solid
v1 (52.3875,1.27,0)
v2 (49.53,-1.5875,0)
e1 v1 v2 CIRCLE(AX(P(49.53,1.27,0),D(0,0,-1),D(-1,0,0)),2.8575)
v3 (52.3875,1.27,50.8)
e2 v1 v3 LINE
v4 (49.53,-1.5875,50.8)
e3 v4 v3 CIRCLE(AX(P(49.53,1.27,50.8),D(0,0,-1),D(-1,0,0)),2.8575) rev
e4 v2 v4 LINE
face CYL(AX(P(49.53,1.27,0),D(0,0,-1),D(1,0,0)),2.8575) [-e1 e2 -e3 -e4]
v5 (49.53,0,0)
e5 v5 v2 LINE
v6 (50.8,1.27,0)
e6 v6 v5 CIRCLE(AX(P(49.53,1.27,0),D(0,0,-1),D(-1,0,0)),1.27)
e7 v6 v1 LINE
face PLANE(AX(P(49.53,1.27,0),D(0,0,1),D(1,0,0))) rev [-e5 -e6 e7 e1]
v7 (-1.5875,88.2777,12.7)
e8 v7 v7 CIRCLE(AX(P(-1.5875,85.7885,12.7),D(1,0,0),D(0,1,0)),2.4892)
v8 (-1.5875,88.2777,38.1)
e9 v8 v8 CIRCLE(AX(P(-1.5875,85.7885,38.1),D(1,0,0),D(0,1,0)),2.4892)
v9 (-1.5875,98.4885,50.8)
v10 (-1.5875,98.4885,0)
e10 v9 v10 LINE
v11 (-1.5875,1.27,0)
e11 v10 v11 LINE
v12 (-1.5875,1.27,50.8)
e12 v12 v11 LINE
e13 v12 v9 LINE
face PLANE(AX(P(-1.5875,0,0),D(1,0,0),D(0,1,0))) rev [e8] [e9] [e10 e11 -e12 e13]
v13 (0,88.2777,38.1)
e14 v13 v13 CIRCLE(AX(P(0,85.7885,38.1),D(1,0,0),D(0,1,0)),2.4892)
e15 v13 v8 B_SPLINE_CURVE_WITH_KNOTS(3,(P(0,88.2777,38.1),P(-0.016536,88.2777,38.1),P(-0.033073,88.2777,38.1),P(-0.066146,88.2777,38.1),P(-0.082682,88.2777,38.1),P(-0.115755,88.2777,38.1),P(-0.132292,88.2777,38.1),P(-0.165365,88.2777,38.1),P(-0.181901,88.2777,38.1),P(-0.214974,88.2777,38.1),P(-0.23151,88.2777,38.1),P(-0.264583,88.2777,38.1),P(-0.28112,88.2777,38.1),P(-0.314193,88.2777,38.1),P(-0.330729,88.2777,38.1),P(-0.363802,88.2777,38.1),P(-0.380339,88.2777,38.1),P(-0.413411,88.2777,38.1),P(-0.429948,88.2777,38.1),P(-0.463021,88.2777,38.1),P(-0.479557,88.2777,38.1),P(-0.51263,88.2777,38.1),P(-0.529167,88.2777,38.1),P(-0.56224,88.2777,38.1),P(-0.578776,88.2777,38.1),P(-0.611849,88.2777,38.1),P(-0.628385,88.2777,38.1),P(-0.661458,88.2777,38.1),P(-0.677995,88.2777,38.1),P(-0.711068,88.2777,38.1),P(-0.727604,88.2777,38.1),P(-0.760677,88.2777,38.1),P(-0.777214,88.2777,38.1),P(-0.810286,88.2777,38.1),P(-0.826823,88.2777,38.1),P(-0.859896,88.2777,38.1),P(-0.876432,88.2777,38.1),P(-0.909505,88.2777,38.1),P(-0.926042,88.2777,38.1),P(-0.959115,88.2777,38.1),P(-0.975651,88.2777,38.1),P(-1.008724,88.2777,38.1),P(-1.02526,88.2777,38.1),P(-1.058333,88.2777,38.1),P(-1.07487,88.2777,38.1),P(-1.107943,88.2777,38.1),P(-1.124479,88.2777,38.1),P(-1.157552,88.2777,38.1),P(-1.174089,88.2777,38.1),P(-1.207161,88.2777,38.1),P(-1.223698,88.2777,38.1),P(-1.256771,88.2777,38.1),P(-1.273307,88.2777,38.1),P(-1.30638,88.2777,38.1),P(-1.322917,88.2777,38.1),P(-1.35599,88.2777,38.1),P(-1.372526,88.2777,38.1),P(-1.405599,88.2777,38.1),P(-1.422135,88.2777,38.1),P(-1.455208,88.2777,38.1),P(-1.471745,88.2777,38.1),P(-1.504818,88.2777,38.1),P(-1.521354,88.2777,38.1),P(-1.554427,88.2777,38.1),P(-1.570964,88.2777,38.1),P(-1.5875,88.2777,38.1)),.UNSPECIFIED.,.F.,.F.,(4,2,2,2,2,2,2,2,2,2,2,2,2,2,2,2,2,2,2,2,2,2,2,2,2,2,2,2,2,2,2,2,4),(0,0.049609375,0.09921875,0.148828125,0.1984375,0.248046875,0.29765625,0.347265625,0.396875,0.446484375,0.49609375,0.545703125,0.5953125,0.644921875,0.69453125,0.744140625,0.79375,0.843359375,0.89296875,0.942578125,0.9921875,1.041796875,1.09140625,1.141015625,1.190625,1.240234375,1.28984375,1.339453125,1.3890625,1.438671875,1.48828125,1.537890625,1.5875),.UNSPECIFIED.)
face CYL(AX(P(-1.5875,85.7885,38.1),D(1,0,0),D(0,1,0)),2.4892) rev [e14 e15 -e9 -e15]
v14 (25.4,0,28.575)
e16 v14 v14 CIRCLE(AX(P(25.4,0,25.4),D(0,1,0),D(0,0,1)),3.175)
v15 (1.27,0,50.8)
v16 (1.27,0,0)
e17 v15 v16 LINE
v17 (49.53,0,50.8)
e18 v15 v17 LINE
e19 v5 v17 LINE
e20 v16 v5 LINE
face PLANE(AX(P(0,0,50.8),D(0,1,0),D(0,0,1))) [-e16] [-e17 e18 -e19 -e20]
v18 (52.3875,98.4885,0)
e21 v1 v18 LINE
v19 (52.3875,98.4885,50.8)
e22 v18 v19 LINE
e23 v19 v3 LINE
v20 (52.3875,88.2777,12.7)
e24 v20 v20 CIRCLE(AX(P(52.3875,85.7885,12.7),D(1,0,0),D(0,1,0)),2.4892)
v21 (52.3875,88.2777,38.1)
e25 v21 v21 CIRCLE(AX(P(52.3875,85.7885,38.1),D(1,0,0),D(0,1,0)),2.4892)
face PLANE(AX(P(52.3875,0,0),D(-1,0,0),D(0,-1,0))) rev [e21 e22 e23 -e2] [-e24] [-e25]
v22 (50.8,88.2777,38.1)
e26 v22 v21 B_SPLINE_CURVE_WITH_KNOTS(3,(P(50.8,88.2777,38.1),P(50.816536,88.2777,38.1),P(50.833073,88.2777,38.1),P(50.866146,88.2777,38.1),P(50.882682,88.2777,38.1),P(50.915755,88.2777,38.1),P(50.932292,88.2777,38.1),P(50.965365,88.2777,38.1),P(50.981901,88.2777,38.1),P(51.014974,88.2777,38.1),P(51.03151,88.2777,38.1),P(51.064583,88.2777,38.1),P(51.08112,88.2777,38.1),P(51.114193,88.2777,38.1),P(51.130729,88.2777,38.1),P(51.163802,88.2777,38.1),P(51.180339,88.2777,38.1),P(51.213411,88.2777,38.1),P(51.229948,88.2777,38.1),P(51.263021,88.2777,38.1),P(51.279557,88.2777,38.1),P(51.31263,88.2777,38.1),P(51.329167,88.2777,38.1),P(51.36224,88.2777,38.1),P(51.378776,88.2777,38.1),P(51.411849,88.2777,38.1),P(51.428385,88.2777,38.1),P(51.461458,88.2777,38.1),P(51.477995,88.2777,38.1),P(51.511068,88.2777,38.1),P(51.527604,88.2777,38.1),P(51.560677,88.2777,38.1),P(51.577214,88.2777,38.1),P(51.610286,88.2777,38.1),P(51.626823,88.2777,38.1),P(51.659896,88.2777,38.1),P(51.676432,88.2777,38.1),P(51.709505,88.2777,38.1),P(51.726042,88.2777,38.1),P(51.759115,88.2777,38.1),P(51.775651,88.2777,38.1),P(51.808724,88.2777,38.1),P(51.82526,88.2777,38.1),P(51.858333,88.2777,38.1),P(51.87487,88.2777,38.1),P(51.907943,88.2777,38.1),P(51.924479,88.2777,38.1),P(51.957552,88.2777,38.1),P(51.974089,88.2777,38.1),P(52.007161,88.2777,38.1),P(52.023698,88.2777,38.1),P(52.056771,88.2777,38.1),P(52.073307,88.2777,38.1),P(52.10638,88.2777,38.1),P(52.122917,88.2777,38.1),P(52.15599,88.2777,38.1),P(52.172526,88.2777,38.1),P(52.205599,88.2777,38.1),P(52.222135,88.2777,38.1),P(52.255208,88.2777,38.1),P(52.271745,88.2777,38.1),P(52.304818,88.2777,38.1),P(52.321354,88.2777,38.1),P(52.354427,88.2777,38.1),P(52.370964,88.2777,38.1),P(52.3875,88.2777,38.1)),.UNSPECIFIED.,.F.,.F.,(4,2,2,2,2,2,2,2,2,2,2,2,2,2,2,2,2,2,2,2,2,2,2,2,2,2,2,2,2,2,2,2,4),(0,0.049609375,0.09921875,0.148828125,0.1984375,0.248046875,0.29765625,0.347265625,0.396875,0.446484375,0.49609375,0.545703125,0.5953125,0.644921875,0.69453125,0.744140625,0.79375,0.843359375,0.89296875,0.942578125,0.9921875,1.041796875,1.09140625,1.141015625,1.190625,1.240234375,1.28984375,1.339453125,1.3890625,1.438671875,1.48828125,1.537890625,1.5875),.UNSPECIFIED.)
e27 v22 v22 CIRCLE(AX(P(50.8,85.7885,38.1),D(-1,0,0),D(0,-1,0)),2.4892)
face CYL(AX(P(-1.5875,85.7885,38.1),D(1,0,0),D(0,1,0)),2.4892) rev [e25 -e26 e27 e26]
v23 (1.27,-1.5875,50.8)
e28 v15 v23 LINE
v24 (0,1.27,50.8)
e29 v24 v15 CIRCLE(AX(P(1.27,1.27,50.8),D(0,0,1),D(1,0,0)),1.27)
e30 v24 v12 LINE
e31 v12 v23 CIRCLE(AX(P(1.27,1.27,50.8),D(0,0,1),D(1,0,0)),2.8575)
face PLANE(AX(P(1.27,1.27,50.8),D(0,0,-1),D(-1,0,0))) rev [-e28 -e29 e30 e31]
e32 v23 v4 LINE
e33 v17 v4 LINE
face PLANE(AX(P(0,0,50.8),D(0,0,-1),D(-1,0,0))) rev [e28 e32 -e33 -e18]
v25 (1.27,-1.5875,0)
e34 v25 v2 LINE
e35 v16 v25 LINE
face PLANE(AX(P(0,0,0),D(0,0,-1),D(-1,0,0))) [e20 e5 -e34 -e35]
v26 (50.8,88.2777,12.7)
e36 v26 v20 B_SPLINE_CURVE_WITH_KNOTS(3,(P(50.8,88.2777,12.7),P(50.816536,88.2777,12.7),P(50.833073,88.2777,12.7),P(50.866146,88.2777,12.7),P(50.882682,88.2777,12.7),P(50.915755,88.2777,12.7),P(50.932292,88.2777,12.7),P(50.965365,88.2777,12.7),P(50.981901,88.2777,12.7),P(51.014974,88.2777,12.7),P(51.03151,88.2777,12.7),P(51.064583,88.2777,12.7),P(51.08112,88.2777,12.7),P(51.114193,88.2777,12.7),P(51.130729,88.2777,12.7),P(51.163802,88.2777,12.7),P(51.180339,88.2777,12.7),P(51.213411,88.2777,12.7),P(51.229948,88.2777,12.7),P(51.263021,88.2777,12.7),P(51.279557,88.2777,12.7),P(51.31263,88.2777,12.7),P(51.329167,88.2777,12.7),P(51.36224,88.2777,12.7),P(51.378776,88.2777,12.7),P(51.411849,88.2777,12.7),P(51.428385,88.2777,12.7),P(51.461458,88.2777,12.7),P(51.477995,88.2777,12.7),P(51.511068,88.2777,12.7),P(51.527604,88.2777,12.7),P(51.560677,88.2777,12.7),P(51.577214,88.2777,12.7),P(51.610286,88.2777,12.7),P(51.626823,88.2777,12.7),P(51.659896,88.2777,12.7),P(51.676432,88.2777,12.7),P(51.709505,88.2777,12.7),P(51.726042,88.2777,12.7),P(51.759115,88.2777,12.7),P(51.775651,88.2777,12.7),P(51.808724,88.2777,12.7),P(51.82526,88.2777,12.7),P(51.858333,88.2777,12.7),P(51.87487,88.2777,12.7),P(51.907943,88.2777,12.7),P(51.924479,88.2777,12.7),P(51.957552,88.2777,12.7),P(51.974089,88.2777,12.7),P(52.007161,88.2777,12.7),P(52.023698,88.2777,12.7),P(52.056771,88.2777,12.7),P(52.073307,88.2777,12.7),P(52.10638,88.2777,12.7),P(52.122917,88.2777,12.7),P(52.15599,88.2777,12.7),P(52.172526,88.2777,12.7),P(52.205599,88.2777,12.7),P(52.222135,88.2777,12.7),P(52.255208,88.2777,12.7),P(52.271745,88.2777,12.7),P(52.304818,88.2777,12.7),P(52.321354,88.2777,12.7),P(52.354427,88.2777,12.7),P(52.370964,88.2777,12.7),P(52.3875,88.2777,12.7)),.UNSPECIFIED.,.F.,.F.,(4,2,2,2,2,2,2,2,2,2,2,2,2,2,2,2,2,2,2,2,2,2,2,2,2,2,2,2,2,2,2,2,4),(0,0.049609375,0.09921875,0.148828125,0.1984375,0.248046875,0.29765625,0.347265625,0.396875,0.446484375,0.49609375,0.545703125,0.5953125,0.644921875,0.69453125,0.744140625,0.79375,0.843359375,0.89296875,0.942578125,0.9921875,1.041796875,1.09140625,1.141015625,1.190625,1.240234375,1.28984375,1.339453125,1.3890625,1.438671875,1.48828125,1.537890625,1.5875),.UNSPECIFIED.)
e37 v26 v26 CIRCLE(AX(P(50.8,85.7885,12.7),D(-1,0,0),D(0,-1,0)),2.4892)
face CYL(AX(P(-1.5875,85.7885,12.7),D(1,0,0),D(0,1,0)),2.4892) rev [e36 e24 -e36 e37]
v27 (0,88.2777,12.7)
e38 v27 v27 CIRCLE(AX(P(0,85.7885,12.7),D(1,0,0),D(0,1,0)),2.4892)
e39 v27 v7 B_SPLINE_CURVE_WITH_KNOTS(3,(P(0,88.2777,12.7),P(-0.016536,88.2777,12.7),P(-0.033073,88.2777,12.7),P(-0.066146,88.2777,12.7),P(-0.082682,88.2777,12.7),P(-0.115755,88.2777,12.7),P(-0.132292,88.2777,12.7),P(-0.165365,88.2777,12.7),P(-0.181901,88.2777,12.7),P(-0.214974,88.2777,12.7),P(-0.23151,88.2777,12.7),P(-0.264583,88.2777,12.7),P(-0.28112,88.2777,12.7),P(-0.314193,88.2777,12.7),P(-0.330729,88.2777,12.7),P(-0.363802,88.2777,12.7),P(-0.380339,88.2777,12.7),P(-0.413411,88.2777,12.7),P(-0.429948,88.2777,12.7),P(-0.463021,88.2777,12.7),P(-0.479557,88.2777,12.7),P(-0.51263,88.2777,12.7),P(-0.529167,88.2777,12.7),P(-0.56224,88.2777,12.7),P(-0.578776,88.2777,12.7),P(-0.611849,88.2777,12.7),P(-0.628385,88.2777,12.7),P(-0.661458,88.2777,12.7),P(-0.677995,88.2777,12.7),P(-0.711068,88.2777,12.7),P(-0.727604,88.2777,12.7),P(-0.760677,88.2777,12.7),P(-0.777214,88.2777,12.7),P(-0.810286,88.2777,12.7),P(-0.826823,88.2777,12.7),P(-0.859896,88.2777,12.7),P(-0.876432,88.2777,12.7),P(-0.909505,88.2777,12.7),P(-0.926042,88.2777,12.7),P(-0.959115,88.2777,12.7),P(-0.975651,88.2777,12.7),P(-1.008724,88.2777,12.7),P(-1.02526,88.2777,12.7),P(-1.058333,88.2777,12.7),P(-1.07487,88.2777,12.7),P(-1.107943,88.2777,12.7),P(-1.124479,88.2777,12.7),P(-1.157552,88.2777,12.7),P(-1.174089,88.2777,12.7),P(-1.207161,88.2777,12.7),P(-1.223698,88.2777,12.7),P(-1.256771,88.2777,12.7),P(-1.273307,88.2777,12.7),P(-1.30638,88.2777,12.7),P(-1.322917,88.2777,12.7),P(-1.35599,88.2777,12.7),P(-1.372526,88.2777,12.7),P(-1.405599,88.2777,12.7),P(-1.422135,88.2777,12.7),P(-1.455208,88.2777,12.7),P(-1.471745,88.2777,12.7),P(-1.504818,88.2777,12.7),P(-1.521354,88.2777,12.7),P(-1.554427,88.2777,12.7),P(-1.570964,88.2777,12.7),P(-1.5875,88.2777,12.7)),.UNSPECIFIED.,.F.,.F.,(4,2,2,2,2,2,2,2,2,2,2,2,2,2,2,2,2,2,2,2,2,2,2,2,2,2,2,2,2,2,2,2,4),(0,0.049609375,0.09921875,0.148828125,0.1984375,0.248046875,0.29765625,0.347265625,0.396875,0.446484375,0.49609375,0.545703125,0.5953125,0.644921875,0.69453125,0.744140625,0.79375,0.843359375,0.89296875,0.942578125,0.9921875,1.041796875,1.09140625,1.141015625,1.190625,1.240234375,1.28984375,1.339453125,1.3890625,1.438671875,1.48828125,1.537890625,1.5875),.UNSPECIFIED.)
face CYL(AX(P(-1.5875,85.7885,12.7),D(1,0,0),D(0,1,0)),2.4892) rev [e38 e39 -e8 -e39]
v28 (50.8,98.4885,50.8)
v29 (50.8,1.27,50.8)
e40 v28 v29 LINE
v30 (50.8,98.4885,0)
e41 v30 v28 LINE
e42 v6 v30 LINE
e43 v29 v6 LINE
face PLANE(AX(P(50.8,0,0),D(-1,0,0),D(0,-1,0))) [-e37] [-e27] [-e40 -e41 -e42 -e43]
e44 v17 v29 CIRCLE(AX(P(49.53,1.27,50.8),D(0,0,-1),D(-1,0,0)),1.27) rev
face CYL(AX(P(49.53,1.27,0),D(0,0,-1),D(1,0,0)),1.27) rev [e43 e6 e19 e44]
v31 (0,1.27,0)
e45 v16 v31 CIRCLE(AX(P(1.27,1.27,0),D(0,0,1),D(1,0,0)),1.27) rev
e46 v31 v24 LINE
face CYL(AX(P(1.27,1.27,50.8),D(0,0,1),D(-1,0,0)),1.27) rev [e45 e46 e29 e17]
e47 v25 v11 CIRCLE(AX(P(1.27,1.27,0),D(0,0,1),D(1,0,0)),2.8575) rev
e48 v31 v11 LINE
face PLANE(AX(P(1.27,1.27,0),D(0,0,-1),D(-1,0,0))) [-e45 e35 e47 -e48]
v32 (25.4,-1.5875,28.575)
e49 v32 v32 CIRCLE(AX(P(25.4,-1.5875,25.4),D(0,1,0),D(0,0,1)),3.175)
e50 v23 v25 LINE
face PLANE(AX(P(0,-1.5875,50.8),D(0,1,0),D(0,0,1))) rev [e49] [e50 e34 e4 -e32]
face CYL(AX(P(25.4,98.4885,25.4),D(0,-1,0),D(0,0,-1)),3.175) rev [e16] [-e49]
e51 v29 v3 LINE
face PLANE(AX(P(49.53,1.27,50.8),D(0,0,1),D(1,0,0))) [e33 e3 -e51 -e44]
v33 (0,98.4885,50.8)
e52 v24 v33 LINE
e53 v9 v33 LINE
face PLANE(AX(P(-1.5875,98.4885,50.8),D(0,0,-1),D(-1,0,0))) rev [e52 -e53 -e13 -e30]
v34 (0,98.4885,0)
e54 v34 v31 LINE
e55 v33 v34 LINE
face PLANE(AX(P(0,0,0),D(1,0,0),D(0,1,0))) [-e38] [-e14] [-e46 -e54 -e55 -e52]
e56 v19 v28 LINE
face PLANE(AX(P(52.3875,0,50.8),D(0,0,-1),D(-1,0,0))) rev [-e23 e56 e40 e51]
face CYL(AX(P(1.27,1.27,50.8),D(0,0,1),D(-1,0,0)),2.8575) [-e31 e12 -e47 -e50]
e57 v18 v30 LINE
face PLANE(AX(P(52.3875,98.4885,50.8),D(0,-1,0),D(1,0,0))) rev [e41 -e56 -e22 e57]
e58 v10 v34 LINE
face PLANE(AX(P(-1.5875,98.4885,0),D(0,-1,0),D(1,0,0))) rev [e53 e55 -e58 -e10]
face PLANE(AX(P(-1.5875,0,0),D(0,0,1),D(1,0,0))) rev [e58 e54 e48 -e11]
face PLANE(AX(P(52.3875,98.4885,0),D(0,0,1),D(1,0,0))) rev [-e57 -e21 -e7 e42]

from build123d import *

# Parameters (mm, degrees)
SKETCH9_W                    = 50.8
SKETCH9_H                    = 1.5875
BASE_FLANGE1_DEPTH           = 50.8
EDGE_FLANGE1_STRIP_W         = 8.89
EDGE_FLANGE1_STRIP_H         = 1.5875
EDGE_FLANGE1_STRIP_CUT_DEPTH = 50.8
EDGE_FLANGE1_DEPTH           = 50.8
EDGE_FLANGE2_STRIP_W         = 8.89
EDGE_FLANGE2_STRIP_H         = 1.5875
EDGE_FLANGE2_STRIP_CUT_DEPTH = 50.8
EDGE_FLANGE2_DEPTH           = 50.8
SKETCH20_R                   = 2.4892
CUT_EXTRUDE1_DEPTH           = 124.263641262
CUT_EXTRUDE2_DEPTH           = 124.855948312
CUT_EXTRUDE2_DEPTH_BACK      = 124.855948312
SKETCH21_R                   = 3.175


# Sheet-metal steps are written as plain solids
with BuildPart() as part:
    # Sketch9 → Base-Flange1 (new body)
    with BuildSketch(Plane.XY):
        with Locations((25.4, -0.79375)):
            Rectangle(SKETCH9_W, SKETCH9_H)
    extrude(amount=BASE_FLANGE1_DEPTH)

    # Edge-Flange1 strip (across the edge) → Edge-Flange1 strip cut (cut)
    with BuildSketch(Plane.XY):
        with Locations((-3.175, -0.79375)):
            Rectangle(EDGE_FLANGE1_STRIP_W, EDGE_FLANGE1_STRIP_H)
    extrude(amount=EDGE_FLANGE1_STRIP_CUT_DEPTH, mode=Mode.SUBTRACT)

    # Edge-Flange1 section (across the edge) → Edge-Flange1 (add)
    with BuildSketch(Plane.XY):
        with BuildLine():
            Line((-1.5875, 1.27), (-1.5875, 98.4885))
            Line((-1.5875, 98.4885), (0, 98.4885))
            Line((0, 98.4885), (0, 1.27))
            ThreePointArc((0, 1.27), (0.371974388, 0.371974388), (1.27, 0))
            Line((1.27, 0), (1.27, -1.5875))
            ThreePointArc((1.27, -1.5875), (-0.750557627, -0.750557627), (-1.5875, 1.27))
        make_face()
    extrude(amount=EDGE_FLANGE1_DEPTH)

    # Edge-Flange2 strip (across the edge) → Edge-Flange2 strip cut (cut)
    with BuildSketch(Plane(origin=(50.8, 0, 50.8), x_dir=(-1, 0, 0), z_dir=(0, 0, -1))):
        with Locations((-3.175, -0.79375)):
            Rectangle(EDGE_FLANGE2_STRIP_W, EDGE_FLANGE2_STRIP_H)
    extrude(amount=EDGE_FLANGE2_STRIP_CUT_DEPTH, mode=Mode.SUBTRACT)

    # Edge-Flange2 section (across the edge) → Edge-Flange2 (add)
    with BuildSketch(Plane(origin=(50.8, 0, 50.8), x_dir=(-1, 0, 0), z_dir=(0, 0, -1))):
        with BuildLine():
            Line((-1.5875, 1.27), (-1.5875, 98.4885))
            Line((-1.5875, 98.4885), (0, 98.4885))
            Line((0, 98.4885), (0, 1.27))
            ThreePointArc((0, 1.27), (0.371974388, 0.371974388), (1.27, 0))
            Line((1.27, 0), (1.27, -1.5875))
            ThreePointArc((1.27, -1.5875), (-0.750557627, -0.750557627), (-1.5875, 1.27))
        make_face()
    extrude(amount=EDGE_FLANGE2_DEPTH)

    # Sketch20 → Cut-Extrude1 (cut, through all)
    with BuildSketch(Plane(origin=(52.3875, 0, 0), x_dir=(0, 0, -1), z_dir=(1, 0, 0))):
        with Locations(Location((-38.1, 85.7885, 0), (0, 0, 90))):
            Circle(SKETCH20_R)
        with Locations(Location((-12.7, 85.7885, 0), (0, 0, 90))):
            Circle(SKETCH20_R)
    extrude(amount=-CUT_EXTRUDE1_DEPTH, mode=Mode.SUBTRACT)

    # Sketch21 → Cut-Extrude2 (cut, two sides: drawn at the far end of the back side and taken through both)
    with BuildSketch(Plane.XZ.offset(1.5875).offset(-CUT_EXTRUDE2_DEPTH_BACK)):
        with Locations(Location((25.4, 25.4, 0), (0, 0, 90))):
            Circle(SKETCH21_R)
    extrude(amount=CUT_EXTRUDE2_DEPTH + CUT_EXTRUDE2_DEPTH_BACK, mode=Mode.SUBTRACT)


solid = part.part
